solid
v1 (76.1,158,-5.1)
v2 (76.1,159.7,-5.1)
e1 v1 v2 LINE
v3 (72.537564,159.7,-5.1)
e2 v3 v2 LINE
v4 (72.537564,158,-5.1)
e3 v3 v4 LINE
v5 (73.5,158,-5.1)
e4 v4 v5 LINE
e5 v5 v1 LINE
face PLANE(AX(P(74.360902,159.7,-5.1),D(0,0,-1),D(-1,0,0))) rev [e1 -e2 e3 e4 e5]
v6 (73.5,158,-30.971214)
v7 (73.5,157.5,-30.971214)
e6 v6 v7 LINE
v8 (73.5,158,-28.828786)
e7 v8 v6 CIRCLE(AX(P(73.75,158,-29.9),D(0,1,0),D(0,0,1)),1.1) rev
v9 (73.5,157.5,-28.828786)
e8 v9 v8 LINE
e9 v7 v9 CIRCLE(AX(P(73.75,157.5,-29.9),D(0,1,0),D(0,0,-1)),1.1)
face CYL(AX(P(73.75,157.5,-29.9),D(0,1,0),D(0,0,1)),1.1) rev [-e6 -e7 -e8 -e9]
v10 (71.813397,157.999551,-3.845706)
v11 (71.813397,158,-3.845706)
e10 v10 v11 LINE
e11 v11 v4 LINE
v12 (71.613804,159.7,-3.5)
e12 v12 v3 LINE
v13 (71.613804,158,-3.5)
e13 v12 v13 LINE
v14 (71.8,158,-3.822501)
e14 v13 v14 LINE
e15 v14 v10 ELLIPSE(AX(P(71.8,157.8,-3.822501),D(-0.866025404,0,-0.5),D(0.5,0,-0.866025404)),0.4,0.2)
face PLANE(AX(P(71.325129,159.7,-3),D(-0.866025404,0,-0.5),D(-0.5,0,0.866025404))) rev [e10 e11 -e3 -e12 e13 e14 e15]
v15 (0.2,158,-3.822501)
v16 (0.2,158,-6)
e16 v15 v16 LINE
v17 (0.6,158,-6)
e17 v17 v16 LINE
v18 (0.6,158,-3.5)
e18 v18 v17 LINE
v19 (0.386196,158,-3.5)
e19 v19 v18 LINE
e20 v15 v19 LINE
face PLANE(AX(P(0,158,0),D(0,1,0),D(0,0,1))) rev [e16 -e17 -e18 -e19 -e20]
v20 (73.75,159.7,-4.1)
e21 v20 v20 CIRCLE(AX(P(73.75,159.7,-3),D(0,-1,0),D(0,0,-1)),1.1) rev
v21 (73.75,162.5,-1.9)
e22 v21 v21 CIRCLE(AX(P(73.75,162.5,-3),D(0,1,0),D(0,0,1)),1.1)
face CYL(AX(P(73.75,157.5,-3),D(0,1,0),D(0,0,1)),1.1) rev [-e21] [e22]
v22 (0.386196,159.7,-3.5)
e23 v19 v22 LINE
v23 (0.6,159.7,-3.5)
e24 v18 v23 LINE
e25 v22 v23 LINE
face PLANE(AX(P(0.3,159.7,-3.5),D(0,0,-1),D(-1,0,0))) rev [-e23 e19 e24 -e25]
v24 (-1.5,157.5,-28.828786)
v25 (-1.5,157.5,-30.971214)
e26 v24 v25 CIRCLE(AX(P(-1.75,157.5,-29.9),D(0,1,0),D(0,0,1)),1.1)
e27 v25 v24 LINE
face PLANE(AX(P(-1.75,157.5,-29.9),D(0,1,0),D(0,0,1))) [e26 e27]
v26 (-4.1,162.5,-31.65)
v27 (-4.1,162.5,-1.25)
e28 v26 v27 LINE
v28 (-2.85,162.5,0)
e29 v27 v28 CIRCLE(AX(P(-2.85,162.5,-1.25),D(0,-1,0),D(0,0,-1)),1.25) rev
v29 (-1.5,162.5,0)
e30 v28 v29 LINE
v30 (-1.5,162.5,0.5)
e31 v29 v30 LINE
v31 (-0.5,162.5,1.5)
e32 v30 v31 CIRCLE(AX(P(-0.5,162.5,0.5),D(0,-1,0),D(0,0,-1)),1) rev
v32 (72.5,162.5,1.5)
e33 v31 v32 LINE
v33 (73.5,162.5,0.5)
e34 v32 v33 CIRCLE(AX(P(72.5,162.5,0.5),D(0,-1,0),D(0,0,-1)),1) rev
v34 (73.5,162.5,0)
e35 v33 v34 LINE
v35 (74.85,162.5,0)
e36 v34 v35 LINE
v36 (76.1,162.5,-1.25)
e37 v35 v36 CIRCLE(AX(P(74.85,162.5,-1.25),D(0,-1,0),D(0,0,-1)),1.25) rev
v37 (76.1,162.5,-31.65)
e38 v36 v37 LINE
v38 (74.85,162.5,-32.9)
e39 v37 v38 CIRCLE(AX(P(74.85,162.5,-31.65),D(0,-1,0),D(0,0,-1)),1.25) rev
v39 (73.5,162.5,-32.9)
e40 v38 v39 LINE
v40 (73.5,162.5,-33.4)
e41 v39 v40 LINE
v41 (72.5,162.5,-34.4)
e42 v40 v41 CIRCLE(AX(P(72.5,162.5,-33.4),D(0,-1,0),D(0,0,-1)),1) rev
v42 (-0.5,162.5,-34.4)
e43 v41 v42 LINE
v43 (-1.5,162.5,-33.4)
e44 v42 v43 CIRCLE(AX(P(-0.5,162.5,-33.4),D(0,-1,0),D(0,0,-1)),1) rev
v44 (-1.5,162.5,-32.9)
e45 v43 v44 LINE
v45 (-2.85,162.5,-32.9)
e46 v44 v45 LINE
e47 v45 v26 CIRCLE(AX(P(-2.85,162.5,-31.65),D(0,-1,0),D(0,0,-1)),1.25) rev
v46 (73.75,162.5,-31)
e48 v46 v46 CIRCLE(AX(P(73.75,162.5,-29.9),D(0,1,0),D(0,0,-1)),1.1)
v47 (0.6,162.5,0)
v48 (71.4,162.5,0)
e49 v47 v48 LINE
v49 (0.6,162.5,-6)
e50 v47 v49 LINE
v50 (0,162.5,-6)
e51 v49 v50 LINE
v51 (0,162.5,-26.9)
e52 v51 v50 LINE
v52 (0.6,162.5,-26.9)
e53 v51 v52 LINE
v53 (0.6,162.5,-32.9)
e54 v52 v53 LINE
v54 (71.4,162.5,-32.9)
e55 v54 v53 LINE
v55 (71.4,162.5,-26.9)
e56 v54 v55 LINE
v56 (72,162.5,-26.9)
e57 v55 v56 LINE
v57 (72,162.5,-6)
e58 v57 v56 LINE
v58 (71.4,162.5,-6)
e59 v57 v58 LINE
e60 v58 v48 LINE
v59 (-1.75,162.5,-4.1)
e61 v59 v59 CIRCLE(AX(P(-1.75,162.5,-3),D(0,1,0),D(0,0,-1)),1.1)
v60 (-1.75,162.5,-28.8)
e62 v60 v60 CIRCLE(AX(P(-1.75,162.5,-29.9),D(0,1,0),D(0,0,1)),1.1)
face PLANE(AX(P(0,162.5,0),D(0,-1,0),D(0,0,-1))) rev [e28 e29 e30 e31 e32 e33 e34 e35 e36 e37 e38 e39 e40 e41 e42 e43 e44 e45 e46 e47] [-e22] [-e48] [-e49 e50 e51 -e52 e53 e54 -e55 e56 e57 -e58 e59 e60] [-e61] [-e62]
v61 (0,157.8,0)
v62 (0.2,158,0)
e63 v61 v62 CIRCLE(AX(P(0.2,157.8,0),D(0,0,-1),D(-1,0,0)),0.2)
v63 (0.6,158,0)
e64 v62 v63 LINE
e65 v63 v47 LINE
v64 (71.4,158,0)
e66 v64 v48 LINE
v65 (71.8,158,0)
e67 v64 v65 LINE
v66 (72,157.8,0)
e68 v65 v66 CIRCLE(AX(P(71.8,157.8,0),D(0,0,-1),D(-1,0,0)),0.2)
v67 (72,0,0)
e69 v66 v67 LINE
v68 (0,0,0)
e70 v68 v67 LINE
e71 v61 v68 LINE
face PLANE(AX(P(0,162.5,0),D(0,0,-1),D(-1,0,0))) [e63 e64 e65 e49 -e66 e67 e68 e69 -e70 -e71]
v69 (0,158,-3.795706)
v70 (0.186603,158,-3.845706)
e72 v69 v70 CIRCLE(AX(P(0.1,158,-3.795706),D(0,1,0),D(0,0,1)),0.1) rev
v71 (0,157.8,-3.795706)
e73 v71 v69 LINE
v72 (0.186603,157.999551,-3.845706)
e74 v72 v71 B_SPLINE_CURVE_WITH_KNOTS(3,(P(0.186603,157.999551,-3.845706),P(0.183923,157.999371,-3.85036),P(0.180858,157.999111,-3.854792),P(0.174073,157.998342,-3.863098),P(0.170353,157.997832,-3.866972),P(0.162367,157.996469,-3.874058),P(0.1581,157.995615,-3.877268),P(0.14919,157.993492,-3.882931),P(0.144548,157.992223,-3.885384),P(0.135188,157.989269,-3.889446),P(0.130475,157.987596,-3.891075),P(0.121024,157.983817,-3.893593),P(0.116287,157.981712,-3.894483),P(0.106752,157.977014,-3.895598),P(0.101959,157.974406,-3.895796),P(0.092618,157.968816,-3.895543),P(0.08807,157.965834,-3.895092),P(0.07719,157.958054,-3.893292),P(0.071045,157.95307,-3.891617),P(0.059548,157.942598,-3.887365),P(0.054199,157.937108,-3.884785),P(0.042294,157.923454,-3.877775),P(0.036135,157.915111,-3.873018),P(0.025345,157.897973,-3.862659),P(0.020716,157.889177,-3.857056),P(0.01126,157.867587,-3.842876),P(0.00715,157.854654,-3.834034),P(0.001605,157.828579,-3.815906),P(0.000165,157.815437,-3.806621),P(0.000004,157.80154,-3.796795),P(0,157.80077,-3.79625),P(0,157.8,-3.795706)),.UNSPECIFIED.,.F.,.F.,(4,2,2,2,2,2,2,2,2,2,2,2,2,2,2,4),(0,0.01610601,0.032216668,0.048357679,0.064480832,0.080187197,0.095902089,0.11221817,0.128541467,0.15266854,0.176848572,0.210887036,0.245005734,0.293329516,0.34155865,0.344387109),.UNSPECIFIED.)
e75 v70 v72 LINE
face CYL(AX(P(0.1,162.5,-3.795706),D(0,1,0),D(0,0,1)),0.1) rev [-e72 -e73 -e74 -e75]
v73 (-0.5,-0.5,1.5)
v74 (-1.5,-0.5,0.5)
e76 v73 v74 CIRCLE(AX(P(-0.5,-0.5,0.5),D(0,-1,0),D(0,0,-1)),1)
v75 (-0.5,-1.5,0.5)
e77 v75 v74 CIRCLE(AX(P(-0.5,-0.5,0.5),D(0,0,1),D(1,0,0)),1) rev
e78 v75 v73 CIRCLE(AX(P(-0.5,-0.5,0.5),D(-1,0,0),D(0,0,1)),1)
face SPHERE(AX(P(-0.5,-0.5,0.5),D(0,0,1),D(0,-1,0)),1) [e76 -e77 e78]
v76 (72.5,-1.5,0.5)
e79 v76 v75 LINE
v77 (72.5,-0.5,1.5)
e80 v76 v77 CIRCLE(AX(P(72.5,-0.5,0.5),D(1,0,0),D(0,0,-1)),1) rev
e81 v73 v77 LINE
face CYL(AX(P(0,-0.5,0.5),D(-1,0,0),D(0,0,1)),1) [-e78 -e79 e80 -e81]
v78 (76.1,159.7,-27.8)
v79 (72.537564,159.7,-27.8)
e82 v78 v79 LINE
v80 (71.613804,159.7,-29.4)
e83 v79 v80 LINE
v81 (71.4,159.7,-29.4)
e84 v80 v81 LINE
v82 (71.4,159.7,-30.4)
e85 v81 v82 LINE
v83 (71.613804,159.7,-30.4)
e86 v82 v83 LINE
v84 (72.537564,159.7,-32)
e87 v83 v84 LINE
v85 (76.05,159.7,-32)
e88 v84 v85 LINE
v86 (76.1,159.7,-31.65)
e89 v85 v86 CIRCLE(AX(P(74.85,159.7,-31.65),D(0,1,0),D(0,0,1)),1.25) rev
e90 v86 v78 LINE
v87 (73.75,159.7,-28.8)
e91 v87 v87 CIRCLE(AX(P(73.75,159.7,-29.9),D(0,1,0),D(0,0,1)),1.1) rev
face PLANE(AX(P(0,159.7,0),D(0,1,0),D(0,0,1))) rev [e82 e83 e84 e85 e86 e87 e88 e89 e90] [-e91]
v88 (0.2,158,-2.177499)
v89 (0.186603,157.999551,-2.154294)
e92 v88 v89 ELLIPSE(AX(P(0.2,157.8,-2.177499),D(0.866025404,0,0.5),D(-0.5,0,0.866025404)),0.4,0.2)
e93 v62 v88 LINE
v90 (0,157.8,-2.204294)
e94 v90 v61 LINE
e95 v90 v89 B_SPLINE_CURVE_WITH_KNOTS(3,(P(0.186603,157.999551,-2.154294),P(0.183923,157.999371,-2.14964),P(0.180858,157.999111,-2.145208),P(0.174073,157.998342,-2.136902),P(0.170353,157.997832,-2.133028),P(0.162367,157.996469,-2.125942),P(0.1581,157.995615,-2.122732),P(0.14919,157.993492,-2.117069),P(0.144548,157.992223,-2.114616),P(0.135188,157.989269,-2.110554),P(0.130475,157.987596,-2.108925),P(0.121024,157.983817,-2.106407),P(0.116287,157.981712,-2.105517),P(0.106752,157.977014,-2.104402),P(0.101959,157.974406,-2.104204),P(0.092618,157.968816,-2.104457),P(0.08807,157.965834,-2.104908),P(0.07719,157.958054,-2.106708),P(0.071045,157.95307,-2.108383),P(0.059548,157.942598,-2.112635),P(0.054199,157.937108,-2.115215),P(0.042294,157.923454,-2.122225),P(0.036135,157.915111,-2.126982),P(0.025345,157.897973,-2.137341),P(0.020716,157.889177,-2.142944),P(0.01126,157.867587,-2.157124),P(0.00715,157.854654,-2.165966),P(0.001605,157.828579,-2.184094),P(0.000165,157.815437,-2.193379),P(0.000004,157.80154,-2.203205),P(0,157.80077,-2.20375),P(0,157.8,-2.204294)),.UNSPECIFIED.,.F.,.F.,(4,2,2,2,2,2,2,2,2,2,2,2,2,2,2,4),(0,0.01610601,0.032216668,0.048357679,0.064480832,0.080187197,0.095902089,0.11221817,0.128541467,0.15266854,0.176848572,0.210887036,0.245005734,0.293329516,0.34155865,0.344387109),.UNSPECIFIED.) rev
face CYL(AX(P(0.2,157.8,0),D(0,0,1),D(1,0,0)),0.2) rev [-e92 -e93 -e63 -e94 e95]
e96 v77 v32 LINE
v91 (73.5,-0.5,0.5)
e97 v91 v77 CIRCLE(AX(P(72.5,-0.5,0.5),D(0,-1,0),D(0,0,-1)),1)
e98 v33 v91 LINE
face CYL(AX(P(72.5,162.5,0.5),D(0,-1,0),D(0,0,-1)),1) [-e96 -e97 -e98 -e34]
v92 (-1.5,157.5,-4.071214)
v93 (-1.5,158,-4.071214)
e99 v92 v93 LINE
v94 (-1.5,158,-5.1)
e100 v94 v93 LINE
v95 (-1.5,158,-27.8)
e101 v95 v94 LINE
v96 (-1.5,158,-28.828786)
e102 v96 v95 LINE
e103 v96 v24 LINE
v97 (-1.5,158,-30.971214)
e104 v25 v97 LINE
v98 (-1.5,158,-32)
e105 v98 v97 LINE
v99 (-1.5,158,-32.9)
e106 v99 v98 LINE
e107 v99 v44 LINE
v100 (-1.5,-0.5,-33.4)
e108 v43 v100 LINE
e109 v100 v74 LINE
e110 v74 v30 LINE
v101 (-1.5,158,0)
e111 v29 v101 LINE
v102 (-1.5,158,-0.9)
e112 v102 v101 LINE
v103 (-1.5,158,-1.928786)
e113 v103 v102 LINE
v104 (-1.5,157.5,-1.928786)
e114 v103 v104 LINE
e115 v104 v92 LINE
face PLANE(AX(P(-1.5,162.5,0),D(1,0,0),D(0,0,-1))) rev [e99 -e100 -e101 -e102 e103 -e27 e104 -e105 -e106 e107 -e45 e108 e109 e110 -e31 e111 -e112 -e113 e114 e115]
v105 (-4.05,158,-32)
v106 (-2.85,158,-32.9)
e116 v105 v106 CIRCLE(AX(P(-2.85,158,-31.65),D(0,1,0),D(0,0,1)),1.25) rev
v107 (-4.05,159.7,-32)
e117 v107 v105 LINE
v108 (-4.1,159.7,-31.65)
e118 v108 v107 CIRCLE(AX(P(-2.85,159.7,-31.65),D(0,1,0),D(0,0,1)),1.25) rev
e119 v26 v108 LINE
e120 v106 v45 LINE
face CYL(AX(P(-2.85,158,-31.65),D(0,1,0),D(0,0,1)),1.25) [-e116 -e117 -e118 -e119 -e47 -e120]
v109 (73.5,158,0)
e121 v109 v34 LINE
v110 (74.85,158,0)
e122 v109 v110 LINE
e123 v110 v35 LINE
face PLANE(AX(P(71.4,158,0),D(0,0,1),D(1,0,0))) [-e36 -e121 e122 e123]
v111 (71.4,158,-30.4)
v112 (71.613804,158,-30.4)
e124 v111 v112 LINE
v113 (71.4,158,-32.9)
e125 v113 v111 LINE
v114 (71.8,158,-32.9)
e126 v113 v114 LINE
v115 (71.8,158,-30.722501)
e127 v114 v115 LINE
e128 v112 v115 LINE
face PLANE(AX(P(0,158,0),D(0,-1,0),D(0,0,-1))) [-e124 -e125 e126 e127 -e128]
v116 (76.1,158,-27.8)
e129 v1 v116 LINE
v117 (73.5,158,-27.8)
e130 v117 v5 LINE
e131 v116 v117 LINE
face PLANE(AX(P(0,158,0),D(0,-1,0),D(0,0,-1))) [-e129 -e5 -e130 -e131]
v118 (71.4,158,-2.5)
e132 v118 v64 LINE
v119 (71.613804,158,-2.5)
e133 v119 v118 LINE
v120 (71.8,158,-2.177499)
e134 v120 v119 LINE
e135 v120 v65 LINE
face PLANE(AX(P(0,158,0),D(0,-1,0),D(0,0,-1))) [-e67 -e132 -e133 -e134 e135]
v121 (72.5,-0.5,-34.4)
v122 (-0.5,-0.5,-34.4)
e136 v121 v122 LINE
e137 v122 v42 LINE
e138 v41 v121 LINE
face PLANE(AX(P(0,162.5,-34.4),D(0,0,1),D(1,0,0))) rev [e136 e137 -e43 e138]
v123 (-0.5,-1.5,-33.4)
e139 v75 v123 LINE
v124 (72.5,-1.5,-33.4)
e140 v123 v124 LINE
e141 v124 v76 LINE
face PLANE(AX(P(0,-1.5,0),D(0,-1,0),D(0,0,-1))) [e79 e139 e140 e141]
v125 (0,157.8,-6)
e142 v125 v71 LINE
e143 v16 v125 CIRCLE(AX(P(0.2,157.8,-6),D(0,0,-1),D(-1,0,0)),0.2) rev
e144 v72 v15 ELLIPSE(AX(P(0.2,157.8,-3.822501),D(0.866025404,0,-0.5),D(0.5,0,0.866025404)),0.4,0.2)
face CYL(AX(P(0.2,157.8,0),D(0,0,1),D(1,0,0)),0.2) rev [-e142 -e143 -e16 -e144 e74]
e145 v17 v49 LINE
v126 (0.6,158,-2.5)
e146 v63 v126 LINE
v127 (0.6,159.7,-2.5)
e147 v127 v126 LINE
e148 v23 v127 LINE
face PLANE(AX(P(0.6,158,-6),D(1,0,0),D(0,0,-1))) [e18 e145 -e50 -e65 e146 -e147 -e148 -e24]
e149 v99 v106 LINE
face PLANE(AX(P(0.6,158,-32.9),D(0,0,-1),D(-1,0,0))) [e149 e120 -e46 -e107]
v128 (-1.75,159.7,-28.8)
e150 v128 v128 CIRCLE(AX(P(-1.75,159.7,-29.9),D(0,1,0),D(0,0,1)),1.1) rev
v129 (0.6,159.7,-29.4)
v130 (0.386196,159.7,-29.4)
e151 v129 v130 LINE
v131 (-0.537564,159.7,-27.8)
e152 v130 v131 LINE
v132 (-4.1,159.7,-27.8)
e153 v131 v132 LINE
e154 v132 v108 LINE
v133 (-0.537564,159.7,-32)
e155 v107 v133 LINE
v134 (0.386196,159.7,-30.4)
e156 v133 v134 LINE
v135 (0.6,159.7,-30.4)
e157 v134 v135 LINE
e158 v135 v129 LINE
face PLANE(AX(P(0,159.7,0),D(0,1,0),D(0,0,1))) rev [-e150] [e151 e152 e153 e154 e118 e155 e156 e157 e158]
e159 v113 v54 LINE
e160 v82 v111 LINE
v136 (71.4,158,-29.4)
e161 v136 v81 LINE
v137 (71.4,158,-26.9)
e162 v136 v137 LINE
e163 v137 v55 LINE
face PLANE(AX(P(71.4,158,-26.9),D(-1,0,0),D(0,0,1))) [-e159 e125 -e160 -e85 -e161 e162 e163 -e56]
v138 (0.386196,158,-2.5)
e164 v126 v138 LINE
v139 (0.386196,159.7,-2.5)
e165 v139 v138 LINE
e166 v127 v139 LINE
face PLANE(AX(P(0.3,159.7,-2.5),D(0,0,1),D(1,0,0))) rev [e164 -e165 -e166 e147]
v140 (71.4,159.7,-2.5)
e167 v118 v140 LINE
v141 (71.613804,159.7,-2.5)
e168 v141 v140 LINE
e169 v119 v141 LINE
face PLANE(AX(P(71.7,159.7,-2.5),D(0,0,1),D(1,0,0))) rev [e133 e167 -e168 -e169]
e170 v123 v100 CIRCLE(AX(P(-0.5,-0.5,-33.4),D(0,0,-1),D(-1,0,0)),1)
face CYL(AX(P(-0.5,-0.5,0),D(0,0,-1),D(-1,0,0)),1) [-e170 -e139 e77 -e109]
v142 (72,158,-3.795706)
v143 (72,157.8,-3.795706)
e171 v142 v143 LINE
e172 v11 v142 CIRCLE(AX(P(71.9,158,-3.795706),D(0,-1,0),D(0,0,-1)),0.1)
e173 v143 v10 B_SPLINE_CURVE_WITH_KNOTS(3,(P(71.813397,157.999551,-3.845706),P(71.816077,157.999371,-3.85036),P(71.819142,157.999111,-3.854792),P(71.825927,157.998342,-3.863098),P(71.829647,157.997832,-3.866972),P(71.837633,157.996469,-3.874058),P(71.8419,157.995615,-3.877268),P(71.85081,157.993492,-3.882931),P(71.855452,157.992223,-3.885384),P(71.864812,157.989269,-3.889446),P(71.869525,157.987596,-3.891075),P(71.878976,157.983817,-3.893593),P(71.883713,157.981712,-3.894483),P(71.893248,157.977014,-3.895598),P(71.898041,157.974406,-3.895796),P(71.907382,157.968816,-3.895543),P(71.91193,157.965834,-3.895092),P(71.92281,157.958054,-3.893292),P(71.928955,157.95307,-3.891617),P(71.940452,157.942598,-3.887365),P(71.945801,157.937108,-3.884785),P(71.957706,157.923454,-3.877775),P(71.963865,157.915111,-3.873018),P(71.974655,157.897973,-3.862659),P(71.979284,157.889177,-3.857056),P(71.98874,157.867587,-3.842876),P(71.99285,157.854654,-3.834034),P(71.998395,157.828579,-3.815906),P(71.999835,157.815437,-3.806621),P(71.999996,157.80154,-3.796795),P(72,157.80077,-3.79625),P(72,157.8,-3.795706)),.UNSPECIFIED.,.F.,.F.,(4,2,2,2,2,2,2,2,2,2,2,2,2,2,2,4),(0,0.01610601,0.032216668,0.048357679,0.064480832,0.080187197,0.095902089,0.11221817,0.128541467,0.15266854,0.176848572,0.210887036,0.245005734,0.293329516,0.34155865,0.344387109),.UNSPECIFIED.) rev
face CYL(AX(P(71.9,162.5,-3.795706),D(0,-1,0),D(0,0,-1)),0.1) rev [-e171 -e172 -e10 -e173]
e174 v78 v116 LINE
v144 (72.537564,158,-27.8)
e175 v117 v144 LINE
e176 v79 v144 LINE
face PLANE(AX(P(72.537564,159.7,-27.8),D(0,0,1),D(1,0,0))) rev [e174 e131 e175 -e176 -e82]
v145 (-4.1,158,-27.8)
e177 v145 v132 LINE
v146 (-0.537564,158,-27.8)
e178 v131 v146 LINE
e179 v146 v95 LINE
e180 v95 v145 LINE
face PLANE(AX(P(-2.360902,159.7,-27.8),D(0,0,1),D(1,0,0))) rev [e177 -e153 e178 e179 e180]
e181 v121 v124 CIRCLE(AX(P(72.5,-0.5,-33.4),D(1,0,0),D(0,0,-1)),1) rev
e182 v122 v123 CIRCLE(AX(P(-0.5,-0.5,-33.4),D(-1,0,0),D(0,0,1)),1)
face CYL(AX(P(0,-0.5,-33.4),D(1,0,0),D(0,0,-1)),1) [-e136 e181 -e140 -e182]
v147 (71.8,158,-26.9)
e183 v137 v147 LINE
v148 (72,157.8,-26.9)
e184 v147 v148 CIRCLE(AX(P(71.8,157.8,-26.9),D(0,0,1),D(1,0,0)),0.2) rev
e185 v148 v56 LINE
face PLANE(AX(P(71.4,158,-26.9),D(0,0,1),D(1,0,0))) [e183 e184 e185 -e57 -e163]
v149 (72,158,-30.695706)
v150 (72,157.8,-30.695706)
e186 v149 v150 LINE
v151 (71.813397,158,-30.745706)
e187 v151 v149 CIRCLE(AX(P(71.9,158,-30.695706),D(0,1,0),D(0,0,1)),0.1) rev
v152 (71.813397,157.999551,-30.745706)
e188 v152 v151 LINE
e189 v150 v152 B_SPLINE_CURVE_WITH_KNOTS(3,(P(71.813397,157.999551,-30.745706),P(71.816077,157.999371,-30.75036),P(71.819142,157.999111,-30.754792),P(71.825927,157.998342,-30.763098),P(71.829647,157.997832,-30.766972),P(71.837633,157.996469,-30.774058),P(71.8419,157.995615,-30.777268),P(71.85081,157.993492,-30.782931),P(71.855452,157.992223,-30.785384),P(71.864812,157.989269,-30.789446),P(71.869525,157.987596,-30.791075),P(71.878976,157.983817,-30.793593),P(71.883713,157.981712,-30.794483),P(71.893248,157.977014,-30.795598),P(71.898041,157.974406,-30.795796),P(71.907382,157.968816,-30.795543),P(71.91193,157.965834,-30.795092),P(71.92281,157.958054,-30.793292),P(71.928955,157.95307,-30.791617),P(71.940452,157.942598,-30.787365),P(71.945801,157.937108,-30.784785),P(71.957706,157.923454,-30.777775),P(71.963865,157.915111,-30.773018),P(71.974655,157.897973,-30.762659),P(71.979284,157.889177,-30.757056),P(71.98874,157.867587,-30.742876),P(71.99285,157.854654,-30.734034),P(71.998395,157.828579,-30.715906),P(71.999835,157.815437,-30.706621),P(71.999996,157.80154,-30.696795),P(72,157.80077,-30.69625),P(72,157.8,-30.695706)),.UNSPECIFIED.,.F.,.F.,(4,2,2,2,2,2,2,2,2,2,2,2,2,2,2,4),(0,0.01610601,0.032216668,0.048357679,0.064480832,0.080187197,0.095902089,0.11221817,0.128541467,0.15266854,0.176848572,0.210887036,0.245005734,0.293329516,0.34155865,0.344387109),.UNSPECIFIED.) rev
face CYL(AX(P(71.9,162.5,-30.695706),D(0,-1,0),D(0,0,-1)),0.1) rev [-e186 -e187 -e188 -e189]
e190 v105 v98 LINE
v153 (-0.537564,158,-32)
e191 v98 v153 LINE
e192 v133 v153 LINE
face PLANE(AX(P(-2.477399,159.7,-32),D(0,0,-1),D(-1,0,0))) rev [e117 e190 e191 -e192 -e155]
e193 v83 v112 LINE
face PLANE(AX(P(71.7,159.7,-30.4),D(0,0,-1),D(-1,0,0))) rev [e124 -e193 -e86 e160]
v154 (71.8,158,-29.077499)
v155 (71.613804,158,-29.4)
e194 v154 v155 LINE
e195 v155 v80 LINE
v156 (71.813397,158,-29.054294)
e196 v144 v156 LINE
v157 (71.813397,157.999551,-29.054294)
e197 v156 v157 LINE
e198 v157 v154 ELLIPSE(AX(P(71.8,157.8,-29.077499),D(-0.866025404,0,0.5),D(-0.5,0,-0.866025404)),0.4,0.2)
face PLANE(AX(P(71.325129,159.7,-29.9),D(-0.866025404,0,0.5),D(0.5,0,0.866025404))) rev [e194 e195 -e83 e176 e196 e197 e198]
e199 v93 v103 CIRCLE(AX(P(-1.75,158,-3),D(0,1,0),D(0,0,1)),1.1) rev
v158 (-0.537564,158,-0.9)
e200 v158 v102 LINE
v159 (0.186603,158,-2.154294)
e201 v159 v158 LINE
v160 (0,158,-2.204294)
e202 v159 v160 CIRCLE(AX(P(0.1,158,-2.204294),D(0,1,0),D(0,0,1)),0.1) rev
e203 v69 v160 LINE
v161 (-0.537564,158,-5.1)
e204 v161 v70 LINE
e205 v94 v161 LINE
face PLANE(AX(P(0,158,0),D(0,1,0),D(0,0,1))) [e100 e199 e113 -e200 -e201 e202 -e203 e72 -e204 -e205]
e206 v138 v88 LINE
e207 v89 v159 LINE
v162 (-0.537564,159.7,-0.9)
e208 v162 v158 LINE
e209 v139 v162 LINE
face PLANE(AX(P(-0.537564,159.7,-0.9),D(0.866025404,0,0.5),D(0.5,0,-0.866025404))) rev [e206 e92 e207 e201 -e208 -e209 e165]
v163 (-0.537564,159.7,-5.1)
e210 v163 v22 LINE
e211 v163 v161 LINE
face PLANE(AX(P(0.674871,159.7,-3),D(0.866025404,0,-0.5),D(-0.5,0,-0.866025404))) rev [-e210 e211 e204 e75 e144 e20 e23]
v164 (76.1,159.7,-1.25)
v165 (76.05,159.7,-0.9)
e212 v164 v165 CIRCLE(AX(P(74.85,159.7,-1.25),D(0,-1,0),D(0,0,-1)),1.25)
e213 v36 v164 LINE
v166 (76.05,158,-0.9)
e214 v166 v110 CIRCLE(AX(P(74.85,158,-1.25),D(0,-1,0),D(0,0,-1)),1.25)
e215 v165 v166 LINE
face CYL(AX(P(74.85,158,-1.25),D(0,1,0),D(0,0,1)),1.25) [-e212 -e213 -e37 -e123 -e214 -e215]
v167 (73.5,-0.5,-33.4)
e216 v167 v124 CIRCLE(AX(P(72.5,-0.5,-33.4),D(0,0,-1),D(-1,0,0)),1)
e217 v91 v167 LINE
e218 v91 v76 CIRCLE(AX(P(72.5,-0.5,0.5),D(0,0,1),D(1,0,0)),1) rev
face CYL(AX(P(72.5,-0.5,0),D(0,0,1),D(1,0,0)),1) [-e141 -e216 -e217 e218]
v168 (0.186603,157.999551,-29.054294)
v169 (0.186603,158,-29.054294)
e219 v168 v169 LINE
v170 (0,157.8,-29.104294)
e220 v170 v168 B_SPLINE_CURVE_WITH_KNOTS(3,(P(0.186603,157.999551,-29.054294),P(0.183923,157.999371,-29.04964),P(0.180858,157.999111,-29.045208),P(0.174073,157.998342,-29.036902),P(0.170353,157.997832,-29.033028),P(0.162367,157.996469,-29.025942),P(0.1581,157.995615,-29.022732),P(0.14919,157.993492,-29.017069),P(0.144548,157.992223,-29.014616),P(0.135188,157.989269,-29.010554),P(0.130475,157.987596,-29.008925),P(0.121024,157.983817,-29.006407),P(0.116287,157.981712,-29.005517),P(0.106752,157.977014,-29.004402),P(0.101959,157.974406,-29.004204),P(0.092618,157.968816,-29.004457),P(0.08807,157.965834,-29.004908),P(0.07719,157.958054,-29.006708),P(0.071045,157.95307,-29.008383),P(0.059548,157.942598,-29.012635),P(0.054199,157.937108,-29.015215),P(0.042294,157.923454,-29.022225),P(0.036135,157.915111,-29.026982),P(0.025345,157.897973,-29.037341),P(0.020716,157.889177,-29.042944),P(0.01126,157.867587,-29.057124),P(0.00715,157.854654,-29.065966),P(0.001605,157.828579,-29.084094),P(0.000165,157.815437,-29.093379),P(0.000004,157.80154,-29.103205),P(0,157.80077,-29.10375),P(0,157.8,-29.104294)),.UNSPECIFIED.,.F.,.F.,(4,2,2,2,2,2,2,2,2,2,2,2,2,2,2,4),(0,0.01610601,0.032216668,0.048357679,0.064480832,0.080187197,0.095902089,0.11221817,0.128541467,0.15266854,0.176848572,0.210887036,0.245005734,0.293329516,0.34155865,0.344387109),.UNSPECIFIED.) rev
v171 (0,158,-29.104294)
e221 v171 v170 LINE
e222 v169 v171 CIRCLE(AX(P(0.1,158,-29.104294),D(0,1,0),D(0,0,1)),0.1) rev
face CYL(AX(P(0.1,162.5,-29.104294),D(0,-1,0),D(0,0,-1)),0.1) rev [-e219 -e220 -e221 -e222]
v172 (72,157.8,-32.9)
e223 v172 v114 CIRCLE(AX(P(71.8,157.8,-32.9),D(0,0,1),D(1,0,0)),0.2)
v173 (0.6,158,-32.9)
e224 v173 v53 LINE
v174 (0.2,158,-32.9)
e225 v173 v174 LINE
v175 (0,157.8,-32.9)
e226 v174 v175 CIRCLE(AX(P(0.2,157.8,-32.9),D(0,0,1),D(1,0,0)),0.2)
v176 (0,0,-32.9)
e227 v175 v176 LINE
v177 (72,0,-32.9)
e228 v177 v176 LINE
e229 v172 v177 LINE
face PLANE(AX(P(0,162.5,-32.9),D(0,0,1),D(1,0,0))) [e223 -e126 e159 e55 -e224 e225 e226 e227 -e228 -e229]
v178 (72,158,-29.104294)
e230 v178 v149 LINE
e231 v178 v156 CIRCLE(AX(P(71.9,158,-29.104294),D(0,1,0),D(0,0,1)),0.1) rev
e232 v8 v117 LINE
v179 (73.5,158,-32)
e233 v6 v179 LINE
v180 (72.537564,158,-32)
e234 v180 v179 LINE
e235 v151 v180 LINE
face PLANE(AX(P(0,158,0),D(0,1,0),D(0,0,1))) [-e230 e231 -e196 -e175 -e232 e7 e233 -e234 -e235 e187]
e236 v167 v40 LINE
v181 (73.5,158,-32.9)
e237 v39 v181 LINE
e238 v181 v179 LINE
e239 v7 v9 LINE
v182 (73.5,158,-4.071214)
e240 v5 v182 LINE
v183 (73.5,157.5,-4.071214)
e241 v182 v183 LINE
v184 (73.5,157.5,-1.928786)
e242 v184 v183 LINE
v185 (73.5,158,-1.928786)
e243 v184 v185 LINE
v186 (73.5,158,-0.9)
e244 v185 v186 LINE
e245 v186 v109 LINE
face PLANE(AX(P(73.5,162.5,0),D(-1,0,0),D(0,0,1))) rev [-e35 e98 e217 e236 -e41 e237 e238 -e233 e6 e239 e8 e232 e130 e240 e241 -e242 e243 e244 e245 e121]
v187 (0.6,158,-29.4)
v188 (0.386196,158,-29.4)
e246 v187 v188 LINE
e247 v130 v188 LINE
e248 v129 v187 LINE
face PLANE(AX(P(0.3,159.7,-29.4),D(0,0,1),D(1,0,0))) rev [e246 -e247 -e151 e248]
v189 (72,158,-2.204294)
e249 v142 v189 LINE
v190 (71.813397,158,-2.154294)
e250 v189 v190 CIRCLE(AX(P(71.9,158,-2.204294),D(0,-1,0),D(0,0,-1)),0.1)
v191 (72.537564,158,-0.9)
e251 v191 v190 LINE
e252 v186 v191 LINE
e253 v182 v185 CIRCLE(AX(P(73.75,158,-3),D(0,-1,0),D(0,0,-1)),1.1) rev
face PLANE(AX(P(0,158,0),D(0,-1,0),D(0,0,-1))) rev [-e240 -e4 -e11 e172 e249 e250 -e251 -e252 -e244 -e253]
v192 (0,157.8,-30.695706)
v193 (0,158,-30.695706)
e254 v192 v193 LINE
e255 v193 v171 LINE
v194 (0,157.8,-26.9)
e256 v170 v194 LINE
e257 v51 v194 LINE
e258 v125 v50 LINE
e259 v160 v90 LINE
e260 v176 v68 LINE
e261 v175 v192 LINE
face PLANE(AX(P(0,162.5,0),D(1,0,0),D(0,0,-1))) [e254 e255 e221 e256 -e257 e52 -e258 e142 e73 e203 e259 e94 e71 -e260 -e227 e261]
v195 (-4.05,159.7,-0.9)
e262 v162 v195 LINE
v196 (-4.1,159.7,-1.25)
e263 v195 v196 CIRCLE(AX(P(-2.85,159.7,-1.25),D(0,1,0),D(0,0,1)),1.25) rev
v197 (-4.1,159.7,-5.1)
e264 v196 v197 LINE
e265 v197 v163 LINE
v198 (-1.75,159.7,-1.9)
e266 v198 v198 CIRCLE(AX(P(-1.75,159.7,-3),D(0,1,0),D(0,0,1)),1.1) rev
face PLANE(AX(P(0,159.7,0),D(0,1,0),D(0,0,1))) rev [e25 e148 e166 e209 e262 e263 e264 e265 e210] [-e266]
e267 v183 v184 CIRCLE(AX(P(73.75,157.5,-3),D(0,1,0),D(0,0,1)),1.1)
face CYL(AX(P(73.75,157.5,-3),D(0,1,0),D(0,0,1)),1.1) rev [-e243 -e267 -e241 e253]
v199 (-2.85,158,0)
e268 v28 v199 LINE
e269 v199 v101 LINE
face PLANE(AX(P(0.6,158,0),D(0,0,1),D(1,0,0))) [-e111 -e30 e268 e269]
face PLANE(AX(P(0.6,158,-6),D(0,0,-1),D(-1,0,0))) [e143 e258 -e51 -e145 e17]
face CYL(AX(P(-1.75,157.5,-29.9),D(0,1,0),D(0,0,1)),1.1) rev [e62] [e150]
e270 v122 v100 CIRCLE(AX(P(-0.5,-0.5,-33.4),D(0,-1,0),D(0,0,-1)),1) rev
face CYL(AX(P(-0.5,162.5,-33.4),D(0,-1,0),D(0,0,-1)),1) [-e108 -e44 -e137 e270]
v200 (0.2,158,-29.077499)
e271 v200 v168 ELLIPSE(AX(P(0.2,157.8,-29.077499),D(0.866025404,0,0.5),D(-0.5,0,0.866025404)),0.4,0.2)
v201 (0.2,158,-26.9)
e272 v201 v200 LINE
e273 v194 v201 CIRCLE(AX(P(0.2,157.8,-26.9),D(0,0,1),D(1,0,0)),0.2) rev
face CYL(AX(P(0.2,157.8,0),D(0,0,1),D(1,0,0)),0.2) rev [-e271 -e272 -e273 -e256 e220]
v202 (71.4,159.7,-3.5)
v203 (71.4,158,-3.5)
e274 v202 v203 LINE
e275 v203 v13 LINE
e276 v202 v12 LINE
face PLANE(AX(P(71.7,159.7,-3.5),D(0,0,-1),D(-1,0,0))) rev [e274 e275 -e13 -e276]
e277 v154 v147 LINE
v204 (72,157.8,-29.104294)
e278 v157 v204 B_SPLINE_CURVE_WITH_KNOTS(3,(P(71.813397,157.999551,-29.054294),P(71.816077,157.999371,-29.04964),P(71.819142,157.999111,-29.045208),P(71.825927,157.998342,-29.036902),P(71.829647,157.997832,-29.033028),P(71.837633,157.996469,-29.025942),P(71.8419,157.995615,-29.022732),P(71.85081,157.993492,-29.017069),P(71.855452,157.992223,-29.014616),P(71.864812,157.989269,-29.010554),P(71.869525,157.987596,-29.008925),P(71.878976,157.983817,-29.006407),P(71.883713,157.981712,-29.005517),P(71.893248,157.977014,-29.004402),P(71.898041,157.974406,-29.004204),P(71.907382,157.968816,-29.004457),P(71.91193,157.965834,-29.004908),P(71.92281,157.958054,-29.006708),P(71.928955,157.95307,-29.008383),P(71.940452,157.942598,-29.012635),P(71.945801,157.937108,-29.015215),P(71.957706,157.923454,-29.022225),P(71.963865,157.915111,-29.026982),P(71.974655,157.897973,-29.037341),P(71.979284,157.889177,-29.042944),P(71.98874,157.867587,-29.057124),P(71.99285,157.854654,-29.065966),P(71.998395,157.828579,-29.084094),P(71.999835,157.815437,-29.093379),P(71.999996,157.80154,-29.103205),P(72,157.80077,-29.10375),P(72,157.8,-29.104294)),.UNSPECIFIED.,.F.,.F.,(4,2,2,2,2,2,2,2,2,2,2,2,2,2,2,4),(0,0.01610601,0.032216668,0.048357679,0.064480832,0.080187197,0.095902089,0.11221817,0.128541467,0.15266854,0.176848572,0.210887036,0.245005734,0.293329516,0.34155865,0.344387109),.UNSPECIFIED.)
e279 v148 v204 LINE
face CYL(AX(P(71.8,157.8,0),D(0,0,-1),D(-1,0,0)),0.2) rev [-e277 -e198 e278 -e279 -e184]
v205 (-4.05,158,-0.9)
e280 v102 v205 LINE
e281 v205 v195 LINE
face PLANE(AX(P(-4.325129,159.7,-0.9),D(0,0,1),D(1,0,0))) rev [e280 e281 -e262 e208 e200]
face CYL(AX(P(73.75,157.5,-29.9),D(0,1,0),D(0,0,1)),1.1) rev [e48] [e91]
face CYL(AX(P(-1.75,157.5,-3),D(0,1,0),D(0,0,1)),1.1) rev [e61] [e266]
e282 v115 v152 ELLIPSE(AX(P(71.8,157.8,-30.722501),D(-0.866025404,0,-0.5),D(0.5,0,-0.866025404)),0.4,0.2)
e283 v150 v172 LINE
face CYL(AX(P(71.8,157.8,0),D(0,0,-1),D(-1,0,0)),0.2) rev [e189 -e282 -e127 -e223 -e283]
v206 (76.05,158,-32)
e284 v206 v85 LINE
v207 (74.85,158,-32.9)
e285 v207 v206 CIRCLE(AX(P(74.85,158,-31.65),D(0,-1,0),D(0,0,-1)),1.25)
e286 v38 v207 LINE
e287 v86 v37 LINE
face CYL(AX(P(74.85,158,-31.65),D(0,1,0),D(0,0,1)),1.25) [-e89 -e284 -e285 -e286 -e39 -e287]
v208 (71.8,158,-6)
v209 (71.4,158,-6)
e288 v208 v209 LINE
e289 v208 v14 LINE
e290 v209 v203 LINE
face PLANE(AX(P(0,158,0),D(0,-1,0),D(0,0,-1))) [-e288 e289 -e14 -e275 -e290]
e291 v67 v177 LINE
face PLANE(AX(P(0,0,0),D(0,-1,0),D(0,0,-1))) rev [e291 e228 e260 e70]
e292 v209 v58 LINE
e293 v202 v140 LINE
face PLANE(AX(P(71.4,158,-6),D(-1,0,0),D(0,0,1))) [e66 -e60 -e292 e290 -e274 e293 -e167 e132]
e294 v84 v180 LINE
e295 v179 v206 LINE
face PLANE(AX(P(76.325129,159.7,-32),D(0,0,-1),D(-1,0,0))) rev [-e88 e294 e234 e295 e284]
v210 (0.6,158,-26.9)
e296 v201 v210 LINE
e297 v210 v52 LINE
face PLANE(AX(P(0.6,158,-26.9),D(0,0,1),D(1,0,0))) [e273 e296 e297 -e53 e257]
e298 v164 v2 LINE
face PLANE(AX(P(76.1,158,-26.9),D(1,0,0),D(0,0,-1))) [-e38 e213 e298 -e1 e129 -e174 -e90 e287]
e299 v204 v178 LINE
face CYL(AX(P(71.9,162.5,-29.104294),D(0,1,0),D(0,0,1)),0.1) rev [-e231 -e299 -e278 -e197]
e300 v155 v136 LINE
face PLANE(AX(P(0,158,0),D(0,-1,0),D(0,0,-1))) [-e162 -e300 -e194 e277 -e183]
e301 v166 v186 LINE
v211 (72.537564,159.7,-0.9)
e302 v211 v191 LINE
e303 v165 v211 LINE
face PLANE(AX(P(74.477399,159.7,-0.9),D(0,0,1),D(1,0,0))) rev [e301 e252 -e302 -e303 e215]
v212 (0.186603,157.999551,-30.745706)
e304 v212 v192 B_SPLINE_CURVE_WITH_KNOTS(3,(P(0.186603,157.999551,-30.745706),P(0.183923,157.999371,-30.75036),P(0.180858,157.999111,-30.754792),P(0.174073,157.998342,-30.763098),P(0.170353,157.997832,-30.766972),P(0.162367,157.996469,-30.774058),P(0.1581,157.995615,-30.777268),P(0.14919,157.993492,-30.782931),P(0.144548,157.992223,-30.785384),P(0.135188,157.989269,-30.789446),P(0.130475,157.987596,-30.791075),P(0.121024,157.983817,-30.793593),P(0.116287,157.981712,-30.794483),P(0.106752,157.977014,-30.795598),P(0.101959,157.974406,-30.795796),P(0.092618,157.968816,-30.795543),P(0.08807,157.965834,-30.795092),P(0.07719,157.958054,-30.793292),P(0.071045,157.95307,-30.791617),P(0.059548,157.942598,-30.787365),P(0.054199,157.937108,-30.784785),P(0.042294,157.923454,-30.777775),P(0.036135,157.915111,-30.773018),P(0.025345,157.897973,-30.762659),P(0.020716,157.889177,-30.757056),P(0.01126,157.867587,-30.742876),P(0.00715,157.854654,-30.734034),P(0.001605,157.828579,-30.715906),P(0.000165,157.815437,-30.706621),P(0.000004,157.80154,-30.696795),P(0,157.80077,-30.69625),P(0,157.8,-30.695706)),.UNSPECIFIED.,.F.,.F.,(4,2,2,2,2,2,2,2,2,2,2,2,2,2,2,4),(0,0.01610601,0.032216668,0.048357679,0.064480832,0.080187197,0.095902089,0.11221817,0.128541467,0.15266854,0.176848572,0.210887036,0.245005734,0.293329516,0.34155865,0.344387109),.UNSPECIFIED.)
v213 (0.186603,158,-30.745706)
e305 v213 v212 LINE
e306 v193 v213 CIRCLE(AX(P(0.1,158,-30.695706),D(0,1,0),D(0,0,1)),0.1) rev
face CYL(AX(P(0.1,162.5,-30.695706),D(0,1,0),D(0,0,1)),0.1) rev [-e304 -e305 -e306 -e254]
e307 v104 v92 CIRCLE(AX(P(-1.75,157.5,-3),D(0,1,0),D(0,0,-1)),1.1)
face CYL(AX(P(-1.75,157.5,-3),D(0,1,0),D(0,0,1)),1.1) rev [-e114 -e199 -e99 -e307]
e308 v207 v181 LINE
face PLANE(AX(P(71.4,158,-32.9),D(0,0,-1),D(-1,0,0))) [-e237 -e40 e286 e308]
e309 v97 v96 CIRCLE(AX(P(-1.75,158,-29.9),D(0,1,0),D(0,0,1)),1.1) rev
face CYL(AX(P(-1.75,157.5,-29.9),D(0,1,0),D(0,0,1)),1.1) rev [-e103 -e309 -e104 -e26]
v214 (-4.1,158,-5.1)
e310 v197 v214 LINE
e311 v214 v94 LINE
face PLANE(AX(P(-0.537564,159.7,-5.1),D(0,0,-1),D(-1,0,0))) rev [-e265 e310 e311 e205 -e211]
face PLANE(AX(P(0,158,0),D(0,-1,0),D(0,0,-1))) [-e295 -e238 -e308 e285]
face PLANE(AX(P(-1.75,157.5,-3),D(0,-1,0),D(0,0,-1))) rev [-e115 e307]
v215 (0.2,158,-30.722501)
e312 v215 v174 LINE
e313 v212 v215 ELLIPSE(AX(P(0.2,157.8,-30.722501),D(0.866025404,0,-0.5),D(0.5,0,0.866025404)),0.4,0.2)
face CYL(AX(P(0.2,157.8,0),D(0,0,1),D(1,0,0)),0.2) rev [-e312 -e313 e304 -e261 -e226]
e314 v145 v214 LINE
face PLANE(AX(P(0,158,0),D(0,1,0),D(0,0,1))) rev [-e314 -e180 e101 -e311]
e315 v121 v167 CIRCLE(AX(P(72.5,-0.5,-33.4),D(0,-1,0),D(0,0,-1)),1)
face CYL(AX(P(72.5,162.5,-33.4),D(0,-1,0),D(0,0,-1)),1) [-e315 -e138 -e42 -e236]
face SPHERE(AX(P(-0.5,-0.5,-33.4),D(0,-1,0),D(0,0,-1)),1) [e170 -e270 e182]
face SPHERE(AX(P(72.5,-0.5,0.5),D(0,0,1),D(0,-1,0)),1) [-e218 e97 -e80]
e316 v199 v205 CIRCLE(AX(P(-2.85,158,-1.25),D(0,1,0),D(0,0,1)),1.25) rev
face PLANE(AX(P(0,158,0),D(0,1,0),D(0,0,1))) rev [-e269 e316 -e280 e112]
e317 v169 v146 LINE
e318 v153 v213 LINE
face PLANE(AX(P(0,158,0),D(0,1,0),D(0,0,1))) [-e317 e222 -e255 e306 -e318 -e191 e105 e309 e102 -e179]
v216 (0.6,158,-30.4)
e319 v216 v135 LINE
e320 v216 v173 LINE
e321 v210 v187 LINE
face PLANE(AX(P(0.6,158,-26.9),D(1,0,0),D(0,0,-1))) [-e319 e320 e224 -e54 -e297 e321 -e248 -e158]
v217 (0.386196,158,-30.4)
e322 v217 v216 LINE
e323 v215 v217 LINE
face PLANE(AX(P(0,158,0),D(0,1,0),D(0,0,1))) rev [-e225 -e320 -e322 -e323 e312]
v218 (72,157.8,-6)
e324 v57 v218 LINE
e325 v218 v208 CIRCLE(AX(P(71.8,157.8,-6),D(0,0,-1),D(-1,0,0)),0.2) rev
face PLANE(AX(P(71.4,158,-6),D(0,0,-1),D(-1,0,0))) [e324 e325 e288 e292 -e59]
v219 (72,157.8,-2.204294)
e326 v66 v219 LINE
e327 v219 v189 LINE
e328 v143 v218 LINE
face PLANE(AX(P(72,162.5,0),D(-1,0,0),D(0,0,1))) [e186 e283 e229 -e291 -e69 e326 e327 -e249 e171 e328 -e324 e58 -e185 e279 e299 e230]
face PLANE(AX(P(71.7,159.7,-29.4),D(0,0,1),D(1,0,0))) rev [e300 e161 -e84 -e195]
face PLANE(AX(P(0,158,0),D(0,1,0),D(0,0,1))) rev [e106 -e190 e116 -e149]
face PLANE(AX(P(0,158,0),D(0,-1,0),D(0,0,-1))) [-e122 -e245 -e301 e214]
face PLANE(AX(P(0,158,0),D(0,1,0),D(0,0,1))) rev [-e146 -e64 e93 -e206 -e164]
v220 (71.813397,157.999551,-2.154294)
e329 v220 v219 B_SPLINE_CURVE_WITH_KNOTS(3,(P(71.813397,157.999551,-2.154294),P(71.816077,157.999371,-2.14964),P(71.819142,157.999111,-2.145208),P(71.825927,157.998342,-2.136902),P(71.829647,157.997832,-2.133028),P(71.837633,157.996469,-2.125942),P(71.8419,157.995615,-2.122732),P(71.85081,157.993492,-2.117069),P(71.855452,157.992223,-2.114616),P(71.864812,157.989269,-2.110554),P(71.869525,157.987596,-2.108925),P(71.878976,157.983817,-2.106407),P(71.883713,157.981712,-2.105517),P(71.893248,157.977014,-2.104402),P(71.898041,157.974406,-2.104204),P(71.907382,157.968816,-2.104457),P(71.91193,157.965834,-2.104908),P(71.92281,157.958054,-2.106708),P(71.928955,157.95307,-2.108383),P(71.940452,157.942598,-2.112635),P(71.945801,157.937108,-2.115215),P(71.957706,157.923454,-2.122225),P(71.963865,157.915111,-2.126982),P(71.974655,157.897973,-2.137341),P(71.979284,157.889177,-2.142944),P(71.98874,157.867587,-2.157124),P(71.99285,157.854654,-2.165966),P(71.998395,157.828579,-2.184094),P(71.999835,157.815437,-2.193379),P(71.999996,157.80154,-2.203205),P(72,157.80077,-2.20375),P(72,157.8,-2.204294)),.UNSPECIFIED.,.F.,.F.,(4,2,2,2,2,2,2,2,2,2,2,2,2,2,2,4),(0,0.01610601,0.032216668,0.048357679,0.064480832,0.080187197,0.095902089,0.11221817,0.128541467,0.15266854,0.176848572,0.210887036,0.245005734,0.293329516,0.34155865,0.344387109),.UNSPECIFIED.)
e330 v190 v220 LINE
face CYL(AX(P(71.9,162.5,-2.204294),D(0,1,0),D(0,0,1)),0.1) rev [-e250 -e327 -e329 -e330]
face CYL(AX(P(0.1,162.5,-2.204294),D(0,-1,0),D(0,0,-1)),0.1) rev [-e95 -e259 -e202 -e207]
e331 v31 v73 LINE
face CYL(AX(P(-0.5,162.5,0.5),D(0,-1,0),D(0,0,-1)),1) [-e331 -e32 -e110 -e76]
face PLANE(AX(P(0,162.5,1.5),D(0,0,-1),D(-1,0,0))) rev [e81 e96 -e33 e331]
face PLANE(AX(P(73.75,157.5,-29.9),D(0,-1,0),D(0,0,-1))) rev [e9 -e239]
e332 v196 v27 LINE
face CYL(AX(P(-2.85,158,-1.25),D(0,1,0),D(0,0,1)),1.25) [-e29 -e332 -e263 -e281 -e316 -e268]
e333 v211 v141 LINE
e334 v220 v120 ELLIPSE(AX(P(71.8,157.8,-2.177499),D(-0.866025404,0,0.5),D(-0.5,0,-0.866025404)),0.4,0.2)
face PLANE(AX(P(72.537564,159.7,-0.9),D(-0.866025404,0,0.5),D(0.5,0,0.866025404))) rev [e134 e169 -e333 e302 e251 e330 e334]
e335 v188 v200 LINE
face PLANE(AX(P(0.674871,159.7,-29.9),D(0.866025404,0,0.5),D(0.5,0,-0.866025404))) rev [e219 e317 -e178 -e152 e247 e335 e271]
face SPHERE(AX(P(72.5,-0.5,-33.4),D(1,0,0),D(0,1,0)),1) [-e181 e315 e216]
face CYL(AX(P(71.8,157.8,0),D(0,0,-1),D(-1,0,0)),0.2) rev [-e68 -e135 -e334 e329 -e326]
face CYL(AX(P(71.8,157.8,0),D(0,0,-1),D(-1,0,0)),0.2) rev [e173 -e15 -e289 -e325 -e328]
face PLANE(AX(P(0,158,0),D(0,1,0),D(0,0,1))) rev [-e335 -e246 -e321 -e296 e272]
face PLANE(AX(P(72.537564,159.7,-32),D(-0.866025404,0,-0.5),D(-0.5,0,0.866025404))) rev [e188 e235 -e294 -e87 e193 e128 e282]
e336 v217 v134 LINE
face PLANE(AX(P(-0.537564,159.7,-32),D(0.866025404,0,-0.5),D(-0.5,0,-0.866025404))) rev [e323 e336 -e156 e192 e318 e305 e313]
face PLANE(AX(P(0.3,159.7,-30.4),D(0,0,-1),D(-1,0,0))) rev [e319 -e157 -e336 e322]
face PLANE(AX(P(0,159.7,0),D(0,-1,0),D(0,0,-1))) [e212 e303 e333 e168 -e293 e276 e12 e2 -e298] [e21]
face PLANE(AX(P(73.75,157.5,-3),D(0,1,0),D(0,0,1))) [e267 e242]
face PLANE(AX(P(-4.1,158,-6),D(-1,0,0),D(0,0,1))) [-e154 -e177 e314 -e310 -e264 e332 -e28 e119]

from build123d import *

# Parameters (mm, degrees)
SKETCH_1_W          = 72
SKETCH_1_H          = 32.9
EXTRUDE_1_DEPTH     = 162.5
SHELL_1_T           = 1.5
FILLET_2_R          = 1
EXTRUDE_2_DEPTH     = 4.5
SKETCH_8_R          = 1.1
CUT_EXTRUDE_3_DEPTH = 5
CUT_EXTRUDE_4_DEPTH = 1.7
FILLET_3_R          = 1.25
SKETCH_11_W         = 0.5
SKETCH_11_H         = 1
CUT_EXTRUDE_5_DEPTH = 1.7
FILLET_4_R          = 0.2
FILLET_5_R          = 0.1


with BuildPart() as part:
    # 草图1 → 凸台-拉伸1 (new body)
    with BuildSketch(Plane(origin=(0, 0, 0), x_dir=(1, 0, 0), z_dir=(0, 1, 0))):
        with Locations((36, 16.45)):
            Rectangle(SKETCH_1_W, SKETCH_1_H)
    extrude(amount=EXTRUDE_1_DEPTH)

    # 抽壳1
    shell_1_openings = [part.faces().sort_by_distance(p)[0] for p in [
        (36, 162.5, -16.45),
    ]]
    offset(amount=SHELL_1_T, openings=shell_1_openings, kind=Kind.INTERSECTION)

    # 圆角2
    # the kernel refuses this fillet: 1 mm, written as the material it takes off along each edge
    with BuildSketch(Plane(origin=(72.5, -0.5, -33.4), x_dir=(0, -1, 0), z_dir=(0, 0, -1))) as fillet_2_piece_1_section:
        Polygon((0, 0), (FILLET_2_R, 0), (FILLET_2_R, -FILLET_2_R), (0, -FILLET_2_R), align=None)
    fillet_2_piece_1 = extrude(amount=FILLET_2_R, mode=Mode.PRIVATE)
    fillet_2_piece_1 = fillet_2_piece_1 - Plane(origin=(72.5, -0.5, -33.4), x_dir=(-0.7071067811865475, 0.7071067811865475, 0), z_dir=(0, 0, -1)) * Sphere(FILLET_2_R, mode=Mode.PRIVATE)
    add(fillet_2_piece_1, mode=Mode.SUBTRACT)
    with BuildSketch(Plane(origin=(-0.5, -0.5, -33.4), x_dir=(-1, 0, 0), z_dir=(0, 0, -1))) as fillet_2_piece_2_section:
        Polygon((0, 0), (FILLET_2_R, 0), (FILLET_2_R, -FILLET_2_R), (0, -FILLET_2_R), align=None)
    fillet_2_piece_2 = extrude(amount=FILLET_2_R, mode=Mode.PRIVATE)
    fillet_2_piece_2 = fillet_2_piece_2 - Plane(origin=(-0.5, -0.5, -33.4), x_dir=(0.7071067811865475, 0.7071067811865475, 0), z_dir=(0, 0, -1)) * Sphere(FILLET_2_R, mode=Mode.PRIVATE)
    add(fillet_2_piece_2, mode=Mode.SUBTRACT)
    with BuildSketch(Plane(origin=(72.5, -0.5, 0.5), x_dir=(0, 0, 1), z_dir=(0, -1, 0))) as fillet_2_piece_3_section:
        Polygon((0, 0), (FILLET_2_R, 0), (FILLET_2_R, -FILLET_2_R), (0, -FILLET_2_R), align=None)
    fillet_2_piece_3 = extrude(amount=FILLET_2_R, mode=Mode.PRIVATE)
    fillet_2_piece_3 = fillet_2_piece_3 - Plane(origin=(72.5, -0.5, 0.5), x_dir=(-0.7071067811865475, 0, -0.7071067811865475), z_dir=(0, -1, 0)) * Sphere(FILLET_2_R, mode=Mode.PRIVATE)
    add(fillet_2_piece_3, mode=Mode.SUBTRACT)
    with BuildSketch(Plane(origin=(-0.5, -0.5, 0.5), x_dir=(0, -1, 0), z_dir=(-1, 0, 0))) as fillet_2_piece_4_section:
        Polygon((0, 0), (FILLET_2_R, 0), (FILLET_2_R, FILLET_2_R), (0, FILLET_2_R), align=None)
    fillet_2_piece_4 = extrude(amount=FILLET_2_R, mode=Mode.PRIVATE)
    fillet_2_piece_4 = fillet_2_piece_4 - Plane(origin=(-0.5, -0.5, 0.5), x_dir=(0, 0.7071067811865475, -0.7071067811865475), z_dir=(-1, 0, 0)) * Sphere(FILLET_2_R, mode=Mode.PRIVATE)
    add(fillet_2_piece_4, mode=Mode.SUBTRACT)
    with BuildSketch(Plane(origin=(72.5, -1.5, -34.4), x_dir=(0, 1, 0), z_dir=(-1, 0, 0)), Plane(origin=(-0.5, -1.5, 1.5), x_dir=(0, 1, 0), z_dir=(1, 0, 0))) as fillet_2_piece_5:
        with BuildLine():
            CenterArc((FILLET_2_R, -FILLET_2_R), FILLET_2_R, 90, 90)
            Line((0, -FILLET_2_R), (0, 0))
            Line((0, 0), (FILLET_2_R, 0))
        make_face()
    extrude(amount=73, mode=Mode.SUBTRACT)
    with BuildSketch(Plane(origin=(73.5, -1.5, 0.5), x_dir=(0, 1, 0), z_dir=(0, 0, -1)), Plane(origin=(-1.5, -1.5, -33.4), x_dir=(0, 1, 0), z_dir=(0, 0, 1))) as fillet_2_piece_6:
        with BuildLine():
            CenterArc((FILLET_2_R, -FILLET_2_R), FILLET_2_R, 90, 90)
            Line((0, -FILLET_2_R), (0, 0))
            Line((0, 0), (FILLET_2_R, 0))
        make_face()
    extrude(amount=33.9, mode=Mode.SUBTRACT)
    with BuildSketch(Plane(origin=(-1.5, -0.5, -34.4), x_dir=(1, 0, 0), z_dir=(0, 1, 0)), Plane(origin=(73.5, -0.5, -34.4), x_dir=(0, 0, 1), z_dir=(0, 1, 0)), Plane(origin=(73.5, -0.5, 1.5), x_dir=(-1, 0, 0), z_dir=(0, 1, 0)), Plane(origin=(-1.5, 165, 1.5), x_dir=(1, 0, 0), z_dir=(0, -1, 0))) as fillet_2_piece_7:
        with BuildLine():
            CenterArc((FILLET_2_R, -FILLET_2_R), FILLET_2_R, 90, 90)
            Line((0, -FILLET_2_R), (0, 0))
            Line((0, 0), (FILLET_2_R, 0))
        make_face()
    extrude(amount=165.5, mode=Mode.SUBTRACT)

    # 草图2 → 凸台-拉伸2 (add)
    with BuildSketch(Plane(origin=(0, 162.5, 0), x_dir=(1, 0, 0), z_dir=(0, 1, 0))):
        Polygon((-1.5, 6), (-1.5, 26.9), (0.6, 26.9), (0.6, 32.9), (-4.1, 32.9), (-4.1, 26.9), (-4.1, 6), (-4.1, 0), (0.6, 0), (0.6, 6), align=None)
        Polygon((73.5, 26.9), (73.5, 6), (71.4, 6), (71.4, 0), (76.1, 0), (76.1, 6), (76.1, 26.9), (76.1, 32.9), (71.4, 32.9), (71.4, 26.9), align=None)
    extrude(amount=-EXTRUDE_2_DEPTH)

    # 草图8 → 切除-拉伸3 (cut)
    with BuildSketch(Plane(origin=(0, 162.5, 0), x_dir=(1, 0, 0), z_dir=(0, 1, 0))):
        with Locations(Location((-1.75, 29.9, 0), (0, 0, 270))):
            Circle(SKETCH_8_R)
        with Locations(Location((73.75, 29.9, 0), (0, 0, 256.863441213))):
            Circle(SKETCH_8_R)
        with Locations(Location((73.75, 3, 0), (0, 0, 270))):
            Circle(SKETCH_8_R)
        with Locations(Location((-1.75, 3, 0), (0, 0, 283.136558787))):
            Circle(SKETCH_8_R)
    extrude(amount=-CUT_EXTRUDE_3_DEPTH, mode=Mode.SUBTRACT)

    # 草图10 → 切除-拉伸4 (cut)
    with BuildSketch(Plane.XZ.offset(-158)):
        Polygon((-2.360902354, -27.8), (-4.325128869, -27.8), (-4.325128869, -32), (-2.477398874, -32), (-0.537564435, -32), (0.674871131, -29.9), (-0.537564435, -27.8), align=None)
        Polygon((76.325128869, -27.8), (76.325128869, -32), (74.477398874, -32), (72.537564435, -32), (71.325128869, -29.9), (72.537564435, -27.8), (74.360902354, -27.8), align=None)
        Polygon((-4.325128869, -5.1), (-4.325128869, -0.9), (-2.477398874, -0.9), (-0.537564435, -0.9), (0.674871131, -3), (-0.537564435, -5.1), (-2.360902354, -5.1), align=None)
        Polygon((74.360902354, -5.1), (76.325128869, -5.1), (76.325128869, -0.9), (74.477398874, -0.9), (72.537564435, -0.9), (71.325128869, -3), (72.537564435, -5.1), align=None)
    extrude(amount=-CUT_EXTRUDE_4_DEPTH, mode=Mode.SUBTRACT)

    # 圆角3
    fillet_3_edges = [part.edges().sort_by_distance(p)[0] for p in [
        (76.1, 160.25, -32.9),
        (76.1, 160.25, 0),
        (-4.1, 160.25, 0),
        (-4.1, 160.25, -32.9),
    ]]
    fillet(fillet_3_edges, radius=FILLET_3_R)

    # 草图11 → 切除-拉伸5 (cut)
    with BuildSketch(Plane.XZ.offset(-158)):
        with Locations((0.55, -3)):
            Rectangle(SKETCH_11_W, SKETCH_11_H)
        with Locations((71.45, -3)):
            Rectangle(SKETCH_11_W, SKETCH_11_H)
        with Locations((71.45, -29.9)):
            Rectangle(SKETCH_11_W, SKETCH_11_H)
        with Locations((0.55, -29.9)):
            Rectangle(SKETCH_11_W, SKETCH_11_H)
    extrude(amount=-CUT_EXTRUDE_5_DEPTH, mode=Mode.SUBTRACT)

    # 圆角4
    fillet_4_edges = [part.edges().sort_by_distance(p)[0] for p in [
        (72, 158, -31.984455543),
        (72, 158, -5.084455543),
        (72, 158, -0.915544457),
        (72, 158, -27.815544457),
        (0, 158, -0.915544457),
        (0, 158, -27.815544457),
        (0, 158, -31.984455543),
        (0, 158, -5.084455543),
    ]]
    fillet(fillet_4_edges, radius=FILLET_4_R)

    # 圆角5
    fillet_5_edges = [part.edges().sort_by_distance(p)[0] for p in [
        (0, 157.9, -28.731088913),
        (0, 157.9, -31.068911087),
        (0, 157.9, -4.168911087),
        (0, 157.9, -1.831088913),
        (72, 157.9, -4.168911087),
        (72, 157.9, -1.831088913),
        (72, 157.9, -28.731088913),
        (72, 157.9, -31.068911087),
    ]]
    fillet(fillet_5_edges, radius=FILLET_5_R)


solid = part.part
